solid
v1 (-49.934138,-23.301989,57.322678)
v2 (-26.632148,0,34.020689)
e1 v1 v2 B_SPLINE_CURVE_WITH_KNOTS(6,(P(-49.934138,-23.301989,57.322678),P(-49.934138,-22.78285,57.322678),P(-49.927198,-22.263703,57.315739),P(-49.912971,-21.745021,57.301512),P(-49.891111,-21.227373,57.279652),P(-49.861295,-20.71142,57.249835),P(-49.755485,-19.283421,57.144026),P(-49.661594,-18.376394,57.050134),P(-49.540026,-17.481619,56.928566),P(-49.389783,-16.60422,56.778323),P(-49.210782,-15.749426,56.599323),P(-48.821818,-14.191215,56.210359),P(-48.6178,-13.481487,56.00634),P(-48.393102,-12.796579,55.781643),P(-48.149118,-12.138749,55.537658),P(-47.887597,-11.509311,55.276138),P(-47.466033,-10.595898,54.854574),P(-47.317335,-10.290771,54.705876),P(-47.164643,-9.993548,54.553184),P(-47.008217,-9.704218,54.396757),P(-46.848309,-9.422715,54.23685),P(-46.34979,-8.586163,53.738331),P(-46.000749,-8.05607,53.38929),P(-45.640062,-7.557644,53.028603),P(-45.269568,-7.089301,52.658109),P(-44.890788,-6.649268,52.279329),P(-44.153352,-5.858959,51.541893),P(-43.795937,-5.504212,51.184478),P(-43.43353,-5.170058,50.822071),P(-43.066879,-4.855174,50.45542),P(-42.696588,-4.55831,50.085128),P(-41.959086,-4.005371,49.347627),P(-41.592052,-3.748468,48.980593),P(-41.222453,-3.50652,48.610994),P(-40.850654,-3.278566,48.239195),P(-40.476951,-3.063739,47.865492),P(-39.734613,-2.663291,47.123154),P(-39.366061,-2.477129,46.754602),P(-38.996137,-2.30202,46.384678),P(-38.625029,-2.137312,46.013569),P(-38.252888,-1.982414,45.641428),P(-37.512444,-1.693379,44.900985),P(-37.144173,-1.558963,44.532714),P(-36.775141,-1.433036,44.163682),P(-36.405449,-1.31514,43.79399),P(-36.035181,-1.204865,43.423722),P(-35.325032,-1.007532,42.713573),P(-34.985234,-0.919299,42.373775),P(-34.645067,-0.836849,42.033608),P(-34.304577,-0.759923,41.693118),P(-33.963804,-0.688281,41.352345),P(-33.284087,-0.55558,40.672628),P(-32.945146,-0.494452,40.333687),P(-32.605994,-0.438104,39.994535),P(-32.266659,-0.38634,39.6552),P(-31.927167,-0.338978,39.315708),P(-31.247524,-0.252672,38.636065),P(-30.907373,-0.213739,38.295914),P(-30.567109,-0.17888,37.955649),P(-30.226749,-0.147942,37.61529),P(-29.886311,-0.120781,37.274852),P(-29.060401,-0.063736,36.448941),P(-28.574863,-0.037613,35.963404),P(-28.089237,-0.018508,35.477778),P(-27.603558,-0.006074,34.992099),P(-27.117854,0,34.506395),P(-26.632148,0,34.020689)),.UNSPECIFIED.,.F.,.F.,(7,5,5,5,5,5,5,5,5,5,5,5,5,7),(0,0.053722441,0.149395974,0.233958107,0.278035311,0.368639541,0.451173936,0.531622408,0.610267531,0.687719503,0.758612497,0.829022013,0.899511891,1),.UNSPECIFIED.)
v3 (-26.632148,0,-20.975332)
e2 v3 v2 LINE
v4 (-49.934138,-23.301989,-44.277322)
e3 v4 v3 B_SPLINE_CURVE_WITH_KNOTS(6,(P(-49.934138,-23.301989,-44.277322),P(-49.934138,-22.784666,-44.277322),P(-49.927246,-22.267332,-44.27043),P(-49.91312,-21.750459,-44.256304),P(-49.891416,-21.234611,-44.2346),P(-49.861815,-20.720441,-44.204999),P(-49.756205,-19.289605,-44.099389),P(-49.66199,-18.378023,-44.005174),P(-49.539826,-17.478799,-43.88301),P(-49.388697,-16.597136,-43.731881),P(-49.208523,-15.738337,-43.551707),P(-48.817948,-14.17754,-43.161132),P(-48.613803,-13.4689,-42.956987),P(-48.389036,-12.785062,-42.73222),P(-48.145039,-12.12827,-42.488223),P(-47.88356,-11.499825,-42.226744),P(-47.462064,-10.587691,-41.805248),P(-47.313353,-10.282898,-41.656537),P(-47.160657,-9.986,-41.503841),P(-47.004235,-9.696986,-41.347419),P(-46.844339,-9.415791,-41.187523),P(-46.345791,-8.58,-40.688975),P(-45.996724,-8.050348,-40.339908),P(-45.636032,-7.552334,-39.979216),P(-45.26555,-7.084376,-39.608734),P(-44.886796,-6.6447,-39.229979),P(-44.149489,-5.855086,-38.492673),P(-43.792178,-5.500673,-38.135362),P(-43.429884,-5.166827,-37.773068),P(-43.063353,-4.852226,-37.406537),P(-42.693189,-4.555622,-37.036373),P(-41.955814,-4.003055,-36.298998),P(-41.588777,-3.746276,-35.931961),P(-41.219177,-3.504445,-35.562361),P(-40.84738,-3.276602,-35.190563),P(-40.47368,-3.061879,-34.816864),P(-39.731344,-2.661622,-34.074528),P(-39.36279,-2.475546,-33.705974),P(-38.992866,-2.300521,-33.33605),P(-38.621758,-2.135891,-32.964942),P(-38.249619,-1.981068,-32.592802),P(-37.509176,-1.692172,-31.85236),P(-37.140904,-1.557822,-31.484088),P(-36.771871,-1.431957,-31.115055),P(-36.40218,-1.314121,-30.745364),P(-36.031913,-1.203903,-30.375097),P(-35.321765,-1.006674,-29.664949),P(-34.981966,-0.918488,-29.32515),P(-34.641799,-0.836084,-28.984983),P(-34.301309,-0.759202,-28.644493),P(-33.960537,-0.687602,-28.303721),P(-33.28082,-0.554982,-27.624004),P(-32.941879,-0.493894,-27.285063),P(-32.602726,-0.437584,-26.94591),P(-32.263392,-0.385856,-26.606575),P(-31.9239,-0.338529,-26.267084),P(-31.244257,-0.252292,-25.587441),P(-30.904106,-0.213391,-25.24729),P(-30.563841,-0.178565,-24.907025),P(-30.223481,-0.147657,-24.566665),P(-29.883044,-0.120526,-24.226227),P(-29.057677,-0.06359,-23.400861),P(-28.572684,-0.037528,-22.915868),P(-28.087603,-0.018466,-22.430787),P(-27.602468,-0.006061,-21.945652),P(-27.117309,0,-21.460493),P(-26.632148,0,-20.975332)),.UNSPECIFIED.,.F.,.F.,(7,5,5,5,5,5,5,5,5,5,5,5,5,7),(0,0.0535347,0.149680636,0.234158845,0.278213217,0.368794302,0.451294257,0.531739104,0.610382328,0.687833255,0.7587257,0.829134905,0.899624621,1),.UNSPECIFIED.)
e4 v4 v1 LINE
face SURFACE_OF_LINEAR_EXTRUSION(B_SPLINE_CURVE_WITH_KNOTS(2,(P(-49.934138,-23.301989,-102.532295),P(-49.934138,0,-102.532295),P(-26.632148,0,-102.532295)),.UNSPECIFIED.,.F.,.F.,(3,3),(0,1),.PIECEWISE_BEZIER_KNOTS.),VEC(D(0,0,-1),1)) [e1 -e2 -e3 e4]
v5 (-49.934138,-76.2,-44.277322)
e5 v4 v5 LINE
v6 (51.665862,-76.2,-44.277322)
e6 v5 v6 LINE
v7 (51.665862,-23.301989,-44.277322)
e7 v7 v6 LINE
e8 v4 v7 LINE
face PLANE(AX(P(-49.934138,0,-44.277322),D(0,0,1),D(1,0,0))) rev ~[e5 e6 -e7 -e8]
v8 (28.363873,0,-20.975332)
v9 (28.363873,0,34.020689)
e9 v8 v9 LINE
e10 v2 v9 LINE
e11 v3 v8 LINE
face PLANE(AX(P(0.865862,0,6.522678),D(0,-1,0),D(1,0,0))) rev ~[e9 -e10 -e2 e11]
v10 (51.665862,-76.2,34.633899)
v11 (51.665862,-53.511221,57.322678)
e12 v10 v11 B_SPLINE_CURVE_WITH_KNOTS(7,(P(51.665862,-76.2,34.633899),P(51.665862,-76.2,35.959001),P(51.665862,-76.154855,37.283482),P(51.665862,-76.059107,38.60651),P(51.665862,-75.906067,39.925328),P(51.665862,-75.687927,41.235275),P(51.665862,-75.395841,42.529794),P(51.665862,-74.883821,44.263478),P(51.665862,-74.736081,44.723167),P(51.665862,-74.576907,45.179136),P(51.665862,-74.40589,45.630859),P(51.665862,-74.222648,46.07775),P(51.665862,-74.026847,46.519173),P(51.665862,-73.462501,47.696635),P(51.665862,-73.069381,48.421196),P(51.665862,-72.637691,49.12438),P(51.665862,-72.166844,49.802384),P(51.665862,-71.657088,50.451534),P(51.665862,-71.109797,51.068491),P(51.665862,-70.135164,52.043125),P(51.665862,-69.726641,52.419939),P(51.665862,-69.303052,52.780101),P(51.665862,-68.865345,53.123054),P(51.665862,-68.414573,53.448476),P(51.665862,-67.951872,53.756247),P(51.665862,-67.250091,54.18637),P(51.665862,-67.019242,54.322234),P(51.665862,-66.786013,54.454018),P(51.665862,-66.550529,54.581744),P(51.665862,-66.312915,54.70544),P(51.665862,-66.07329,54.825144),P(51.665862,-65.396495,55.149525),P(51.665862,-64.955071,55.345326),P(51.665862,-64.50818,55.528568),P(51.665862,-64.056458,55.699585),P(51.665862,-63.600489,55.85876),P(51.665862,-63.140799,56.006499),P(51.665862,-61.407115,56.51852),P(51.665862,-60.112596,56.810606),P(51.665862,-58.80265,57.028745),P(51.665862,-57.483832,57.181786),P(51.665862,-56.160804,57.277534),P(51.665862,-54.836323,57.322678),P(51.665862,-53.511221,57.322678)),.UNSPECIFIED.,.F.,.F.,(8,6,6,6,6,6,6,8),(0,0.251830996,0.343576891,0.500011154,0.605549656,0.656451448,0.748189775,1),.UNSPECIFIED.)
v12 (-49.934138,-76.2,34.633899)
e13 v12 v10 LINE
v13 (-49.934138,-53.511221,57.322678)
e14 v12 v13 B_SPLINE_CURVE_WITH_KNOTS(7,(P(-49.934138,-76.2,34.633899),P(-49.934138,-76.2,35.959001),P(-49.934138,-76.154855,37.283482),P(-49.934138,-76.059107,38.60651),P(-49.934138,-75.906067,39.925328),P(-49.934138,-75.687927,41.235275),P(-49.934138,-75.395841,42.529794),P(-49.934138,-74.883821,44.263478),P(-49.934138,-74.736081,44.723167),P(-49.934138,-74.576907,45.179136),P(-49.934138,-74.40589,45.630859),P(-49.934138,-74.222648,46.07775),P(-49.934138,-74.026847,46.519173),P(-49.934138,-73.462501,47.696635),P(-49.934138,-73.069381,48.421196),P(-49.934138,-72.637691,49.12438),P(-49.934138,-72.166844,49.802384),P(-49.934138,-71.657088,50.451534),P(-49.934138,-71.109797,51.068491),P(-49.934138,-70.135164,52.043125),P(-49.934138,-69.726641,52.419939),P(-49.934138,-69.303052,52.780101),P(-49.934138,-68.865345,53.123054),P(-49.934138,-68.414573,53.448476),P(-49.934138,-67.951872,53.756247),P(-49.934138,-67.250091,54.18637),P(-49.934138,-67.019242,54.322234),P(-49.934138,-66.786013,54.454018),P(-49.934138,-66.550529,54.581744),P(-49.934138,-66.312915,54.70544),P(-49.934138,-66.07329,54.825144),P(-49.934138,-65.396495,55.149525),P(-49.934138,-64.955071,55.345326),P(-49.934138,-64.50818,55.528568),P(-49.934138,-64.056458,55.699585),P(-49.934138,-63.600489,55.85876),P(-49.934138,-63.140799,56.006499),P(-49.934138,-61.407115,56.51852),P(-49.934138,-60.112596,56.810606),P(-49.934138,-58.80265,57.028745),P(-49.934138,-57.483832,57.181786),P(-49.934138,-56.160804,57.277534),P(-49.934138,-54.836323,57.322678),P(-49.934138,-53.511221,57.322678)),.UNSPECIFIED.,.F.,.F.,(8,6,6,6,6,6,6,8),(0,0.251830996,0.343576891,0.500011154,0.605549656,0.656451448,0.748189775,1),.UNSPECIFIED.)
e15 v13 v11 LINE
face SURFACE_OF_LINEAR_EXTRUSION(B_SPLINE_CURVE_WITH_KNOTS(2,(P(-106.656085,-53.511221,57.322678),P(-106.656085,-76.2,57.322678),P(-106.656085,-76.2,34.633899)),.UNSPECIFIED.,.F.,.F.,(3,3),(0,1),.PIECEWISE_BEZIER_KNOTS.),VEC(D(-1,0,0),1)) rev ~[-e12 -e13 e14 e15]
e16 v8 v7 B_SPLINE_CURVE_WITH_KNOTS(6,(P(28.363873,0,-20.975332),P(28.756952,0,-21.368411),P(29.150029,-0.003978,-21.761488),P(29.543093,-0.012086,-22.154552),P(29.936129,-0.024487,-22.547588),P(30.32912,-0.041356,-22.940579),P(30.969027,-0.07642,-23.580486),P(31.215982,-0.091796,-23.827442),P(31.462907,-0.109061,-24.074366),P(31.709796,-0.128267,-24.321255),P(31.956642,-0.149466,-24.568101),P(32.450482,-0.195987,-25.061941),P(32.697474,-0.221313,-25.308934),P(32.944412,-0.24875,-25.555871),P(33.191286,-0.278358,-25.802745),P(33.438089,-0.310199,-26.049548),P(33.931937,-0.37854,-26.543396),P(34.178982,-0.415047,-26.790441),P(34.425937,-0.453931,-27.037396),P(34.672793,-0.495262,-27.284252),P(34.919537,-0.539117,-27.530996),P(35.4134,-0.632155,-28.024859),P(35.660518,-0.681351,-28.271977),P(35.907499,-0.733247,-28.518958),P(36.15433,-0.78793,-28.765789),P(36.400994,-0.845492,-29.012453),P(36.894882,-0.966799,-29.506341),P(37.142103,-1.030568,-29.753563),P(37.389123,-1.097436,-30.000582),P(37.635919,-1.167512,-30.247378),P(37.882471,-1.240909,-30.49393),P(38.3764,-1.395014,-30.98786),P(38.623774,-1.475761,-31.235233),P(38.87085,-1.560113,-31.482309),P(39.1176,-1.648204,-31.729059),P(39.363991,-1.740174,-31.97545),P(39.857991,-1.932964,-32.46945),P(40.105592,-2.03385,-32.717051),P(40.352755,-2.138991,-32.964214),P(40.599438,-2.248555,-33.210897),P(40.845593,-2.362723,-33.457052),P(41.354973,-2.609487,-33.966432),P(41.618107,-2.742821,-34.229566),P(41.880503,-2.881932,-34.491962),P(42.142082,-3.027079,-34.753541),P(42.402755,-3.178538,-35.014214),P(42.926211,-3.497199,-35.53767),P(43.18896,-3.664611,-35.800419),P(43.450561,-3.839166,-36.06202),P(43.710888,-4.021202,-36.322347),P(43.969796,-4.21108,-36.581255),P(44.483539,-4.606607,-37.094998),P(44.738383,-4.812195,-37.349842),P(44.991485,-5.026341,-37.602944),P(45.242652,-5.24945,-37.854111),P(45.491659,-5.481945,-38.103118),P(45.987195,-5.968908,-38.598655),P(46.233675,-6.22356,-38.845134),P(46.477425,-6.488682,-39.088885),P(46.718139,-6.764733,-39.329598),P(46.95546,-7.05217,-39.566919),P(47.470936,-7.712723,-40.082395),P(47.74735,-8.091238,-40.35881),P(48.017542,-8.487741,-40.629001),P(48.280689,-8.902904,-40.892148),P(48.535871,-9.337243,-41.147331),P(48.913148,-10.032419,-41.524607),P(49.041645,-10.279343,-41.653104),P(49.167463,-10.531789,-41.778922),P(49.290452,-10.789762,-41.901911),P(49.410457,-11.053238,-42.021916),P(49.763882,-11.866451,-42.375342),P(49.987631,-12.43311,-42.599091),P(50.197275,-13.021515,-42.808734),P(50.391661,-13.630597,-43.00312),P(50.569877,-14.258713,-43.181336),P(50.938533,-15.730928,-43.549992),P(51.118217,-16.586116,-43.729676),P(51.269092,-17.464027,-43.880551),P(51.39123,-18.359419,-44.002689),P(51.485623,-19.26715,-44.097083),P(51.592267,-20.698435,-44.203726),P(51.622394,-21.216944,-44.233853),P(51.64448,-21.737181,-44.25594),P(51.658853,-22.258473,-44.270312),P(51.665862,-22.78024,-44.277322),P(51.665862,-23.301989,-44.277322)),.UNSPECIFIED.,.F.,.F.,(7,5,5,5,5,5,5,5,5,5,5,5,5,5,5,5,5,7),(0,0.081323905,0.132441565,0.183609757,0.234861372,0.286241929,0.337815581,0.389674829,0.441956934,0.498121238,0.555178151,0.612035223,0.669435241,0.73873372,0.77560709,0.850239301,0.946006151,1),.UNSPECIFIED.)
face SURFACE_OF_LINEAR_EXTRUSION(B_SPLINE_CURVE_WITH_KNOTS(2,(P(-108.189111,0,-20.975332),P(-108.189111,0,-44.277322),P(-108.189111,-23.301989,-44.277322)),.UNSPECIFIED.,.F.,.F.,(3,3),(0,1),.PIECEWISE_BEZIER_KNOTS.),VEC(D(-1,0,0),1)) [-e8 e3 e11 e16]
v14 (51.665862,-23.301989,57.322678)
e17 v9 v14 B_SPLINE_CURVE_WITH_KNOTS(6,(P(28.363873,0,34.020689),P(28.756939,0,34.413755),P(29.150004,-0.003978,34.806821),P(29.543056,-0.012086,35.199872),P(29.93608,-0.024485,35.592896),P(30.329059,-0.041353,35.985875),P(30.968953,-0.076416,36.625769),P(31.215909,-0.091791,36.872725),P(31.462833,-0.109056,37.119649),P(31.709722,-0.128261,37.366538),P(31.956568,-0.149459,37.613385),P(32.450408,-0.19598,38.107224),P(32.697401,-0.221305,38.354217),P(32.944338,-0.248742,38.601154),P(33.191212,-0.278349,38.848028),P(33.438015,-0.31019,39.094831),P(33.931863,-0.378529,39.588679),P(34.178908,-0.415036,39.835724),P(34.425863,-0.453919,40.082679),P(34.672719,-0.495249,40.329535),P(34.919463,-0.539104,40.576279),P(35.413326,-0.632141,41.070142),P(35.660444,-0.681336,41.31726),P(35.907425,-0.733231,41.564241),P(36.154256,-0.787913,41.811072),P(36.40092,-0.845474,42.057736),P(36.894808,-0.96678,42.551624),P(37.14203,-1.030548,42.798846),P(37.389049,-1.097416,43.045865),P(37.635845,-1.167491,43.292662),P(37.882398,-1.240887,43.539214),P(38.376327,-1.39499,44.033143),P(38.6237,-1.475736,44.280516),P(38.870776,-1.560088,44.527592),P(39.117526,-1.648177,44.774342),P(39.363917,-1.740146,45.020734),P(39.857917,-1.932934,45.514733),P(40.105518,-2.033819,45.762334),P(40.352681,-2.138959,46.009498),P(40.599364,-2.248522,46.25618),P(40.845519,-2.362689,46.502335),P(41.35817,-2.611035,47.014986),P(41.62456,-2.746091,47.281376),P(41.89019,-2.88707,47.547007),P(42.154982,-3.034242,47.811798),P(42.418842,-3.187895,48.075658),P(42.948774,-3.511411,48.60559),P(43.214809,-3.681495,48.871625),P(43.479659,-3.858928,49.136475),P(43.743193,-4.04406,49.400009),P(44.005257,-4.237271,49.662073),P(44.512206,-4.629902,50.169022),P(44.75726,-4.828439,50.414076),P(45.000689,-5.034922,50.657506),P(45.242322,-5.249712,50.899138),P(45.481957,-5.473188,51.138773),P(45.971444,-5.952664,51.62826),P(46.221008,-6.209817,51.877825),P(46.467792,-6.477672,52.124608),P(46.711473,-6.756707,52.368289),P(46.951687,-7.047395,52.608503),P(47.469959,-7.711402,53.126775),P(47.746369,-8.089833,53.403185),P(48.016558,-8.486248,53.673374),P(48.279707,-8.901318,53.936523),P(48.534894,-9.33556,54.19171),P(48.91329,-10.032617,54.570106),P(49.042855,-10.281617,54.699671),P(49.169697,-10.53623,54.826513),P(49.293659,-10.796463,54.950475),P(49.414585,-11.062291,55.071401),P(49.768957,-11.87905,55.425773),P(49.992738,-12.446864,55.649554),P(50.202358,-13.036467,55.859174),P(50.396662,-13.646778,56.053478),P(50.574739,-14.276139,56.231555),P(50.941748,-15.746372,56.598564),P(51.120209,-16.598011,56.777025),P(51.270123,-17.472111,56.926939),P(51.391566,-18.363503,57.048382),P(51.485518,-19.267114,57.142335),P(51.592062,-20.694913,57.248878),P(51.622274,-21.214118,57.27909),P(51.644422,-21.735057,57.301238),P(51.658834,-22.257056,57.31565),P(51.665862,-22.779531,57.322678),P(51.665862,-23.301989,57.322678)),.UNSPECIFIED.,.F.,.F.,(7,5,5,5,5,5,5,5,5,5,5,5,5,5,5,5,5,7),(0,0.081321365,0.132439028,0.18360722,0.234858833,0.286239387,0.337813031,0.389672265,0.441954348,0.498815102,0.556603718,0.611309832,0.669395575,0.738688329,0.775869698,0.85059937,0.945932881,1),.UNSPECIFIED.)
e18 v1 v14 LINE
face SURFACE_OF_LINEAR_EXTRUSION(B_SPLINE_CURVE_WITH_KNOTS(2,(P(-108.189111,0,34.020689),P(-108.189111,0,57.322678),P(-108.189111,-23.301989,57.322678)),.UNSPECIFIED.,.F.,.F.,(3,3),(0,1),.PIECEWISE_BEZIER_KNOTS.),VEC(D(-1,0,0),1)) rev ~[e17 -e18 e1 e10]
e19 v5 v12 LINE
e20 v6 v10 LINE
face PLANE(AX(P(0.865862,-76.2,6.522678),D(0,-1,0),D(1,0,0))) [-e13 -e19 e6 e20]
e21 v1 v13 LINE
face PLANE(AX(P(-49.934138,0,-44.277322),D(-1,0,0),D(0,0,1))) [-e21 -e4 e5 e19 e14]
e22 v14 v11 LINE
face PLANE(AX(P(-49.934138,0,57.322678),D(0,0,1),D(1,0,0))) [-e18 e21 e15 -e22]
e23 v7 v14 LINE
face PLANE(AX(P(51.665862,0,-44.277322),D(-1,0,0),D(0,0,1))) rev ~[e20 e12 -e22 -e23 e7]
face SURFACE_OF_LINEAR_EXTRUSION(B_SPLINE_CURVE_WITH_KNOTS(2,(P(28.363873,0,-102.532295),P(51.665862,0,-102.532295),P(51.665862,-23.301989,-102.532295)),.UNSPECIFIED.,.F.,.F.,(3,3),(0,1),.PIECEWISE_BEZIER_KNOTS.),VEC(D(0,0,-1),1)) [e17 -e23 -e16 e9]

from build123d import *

# Parameters (mm, degrees)
F0_W        = 101.6
F0_H        = 101.6
F1_DEPTH    = 76.2
F2_T1_DEPTH = 215.0438952959
F3_T1_DEPTH = 218.1099465201
F3_T3_DEPTH = 218.1099465201


# Not quite as in the source:
# - a fillet or chamfer that OpenCascade refuses, or shapes differently, is made with other operations: its cross-section is extruded or revolved along the edge and cut away or added


with BuildPart() as f1:
    # F0 (on Front) → F1 (new body)
    with BuildSketch(Plane.XZ):
        with Locations((0.8658623874, 6.5226784527)):
            Rectangle(F0_W, F0_H)
    extrude(amount=F1_DEPTH)

    # F2: fillet of radius 22.6887790592 on 1 edges, made by hand

    # F2_s2 → F2_t1 (cut)
    with BuildSketch(Plane.YZ.offset(-106.6560852605)):
        with BuildLine():
            add(Edge.make_bspline(
                [(-53.5112209408, 57.3226784527), (-76.2, 57.3226784527), (-76.2, 34.6338993935)],
                knots=[0, 0, 0, 1, 1, 1], degree=2, weights=[1, 1, 1]))
            Line((-76.2, 34.6338993935), (-76.2, 57.3226784527))
            Line((-76.2, 57.3226784527), (-53.5112209408, 57.3226784527))
        make_face()
    extrude(amount=F2_T1_DEPTH, mode=Mode.SUBTRACT)

    # F3: fillet of radius 23.301989304 on 4 edges, made by hand

    # F3_s2 → F3_t1 (cut)
    with BuildSketch(Plane.XY.offset(-102.5322948073)):
        with BuildLine():
            add(Edge.make_bspline(
                [(-49.9341376126, -23.301989304), (-49.9341376126, 0), (-26.6321483086, 0)],
                knots=[0, 0, 0, 1, 1, 1], degree=2, weights=[1, 1, 1]))
            Line((-26.6321483086, 0), (-49.9341376126, 0))
            Line((-49.9341376126, 0), (-49.9341376126, -23.301989304))
        make_face()
        with BuildLine():
            add(Edge.make_bspline(
                [(28.3638730834, 0), (51.6658623874, 0), (51.6658623874, -23.301989304)],
                knots=[0, 0, 0, 1, 1, 1], degree=2, weights=[1, 1, 1]))
            Line((51.6658623874, -23.301989304), (51.6658623874, 0))
            Line((51.6658623874, 0), (28.3638730834, 0))
        make_face()
    extrude(amount=F3_T1_DEPTH, mode=Mode.SUBTRACT)

    # F3_s4 → F3_t3 (cut)
    with BuildSketch(Plane.YZ.offset(-108.1891108726)):
        with BuildLine():
            add(Edge.make_bspline(
                [(0, -20.9753322432), (0, -44.2773215473), (-23.301989304, -44.2773215473)],
                knots=[0, 0, 0, 1, 1, 1], degree=2, weights=[1, 1, 1]))
            Line((-23.301989304, -44.2773215473), (0, -44.2773215473))
            Line((0, -44.2773215473), (0, -20.9753322432))
        make_face()
        with BuildLine():
            add(Edge.make_bspline(
                [(0, 34.0206891487), (0, 57.3226784527), (-23.301989304, 57.3226784527)],
                knots=[0, 0, 0, 1, 1, 1], degree=2, weights=[1, 1, 1]))
            Line((-23.301989304, 57.3226784527), (0, 57.3226784527))
            Line((0, 57.3226784527), (0, 34.0206891487))
        make_face()
    extrude(amount=F3_T3_DEPTH, mode=Mode.SUBTRACT)


solid = f1.part
